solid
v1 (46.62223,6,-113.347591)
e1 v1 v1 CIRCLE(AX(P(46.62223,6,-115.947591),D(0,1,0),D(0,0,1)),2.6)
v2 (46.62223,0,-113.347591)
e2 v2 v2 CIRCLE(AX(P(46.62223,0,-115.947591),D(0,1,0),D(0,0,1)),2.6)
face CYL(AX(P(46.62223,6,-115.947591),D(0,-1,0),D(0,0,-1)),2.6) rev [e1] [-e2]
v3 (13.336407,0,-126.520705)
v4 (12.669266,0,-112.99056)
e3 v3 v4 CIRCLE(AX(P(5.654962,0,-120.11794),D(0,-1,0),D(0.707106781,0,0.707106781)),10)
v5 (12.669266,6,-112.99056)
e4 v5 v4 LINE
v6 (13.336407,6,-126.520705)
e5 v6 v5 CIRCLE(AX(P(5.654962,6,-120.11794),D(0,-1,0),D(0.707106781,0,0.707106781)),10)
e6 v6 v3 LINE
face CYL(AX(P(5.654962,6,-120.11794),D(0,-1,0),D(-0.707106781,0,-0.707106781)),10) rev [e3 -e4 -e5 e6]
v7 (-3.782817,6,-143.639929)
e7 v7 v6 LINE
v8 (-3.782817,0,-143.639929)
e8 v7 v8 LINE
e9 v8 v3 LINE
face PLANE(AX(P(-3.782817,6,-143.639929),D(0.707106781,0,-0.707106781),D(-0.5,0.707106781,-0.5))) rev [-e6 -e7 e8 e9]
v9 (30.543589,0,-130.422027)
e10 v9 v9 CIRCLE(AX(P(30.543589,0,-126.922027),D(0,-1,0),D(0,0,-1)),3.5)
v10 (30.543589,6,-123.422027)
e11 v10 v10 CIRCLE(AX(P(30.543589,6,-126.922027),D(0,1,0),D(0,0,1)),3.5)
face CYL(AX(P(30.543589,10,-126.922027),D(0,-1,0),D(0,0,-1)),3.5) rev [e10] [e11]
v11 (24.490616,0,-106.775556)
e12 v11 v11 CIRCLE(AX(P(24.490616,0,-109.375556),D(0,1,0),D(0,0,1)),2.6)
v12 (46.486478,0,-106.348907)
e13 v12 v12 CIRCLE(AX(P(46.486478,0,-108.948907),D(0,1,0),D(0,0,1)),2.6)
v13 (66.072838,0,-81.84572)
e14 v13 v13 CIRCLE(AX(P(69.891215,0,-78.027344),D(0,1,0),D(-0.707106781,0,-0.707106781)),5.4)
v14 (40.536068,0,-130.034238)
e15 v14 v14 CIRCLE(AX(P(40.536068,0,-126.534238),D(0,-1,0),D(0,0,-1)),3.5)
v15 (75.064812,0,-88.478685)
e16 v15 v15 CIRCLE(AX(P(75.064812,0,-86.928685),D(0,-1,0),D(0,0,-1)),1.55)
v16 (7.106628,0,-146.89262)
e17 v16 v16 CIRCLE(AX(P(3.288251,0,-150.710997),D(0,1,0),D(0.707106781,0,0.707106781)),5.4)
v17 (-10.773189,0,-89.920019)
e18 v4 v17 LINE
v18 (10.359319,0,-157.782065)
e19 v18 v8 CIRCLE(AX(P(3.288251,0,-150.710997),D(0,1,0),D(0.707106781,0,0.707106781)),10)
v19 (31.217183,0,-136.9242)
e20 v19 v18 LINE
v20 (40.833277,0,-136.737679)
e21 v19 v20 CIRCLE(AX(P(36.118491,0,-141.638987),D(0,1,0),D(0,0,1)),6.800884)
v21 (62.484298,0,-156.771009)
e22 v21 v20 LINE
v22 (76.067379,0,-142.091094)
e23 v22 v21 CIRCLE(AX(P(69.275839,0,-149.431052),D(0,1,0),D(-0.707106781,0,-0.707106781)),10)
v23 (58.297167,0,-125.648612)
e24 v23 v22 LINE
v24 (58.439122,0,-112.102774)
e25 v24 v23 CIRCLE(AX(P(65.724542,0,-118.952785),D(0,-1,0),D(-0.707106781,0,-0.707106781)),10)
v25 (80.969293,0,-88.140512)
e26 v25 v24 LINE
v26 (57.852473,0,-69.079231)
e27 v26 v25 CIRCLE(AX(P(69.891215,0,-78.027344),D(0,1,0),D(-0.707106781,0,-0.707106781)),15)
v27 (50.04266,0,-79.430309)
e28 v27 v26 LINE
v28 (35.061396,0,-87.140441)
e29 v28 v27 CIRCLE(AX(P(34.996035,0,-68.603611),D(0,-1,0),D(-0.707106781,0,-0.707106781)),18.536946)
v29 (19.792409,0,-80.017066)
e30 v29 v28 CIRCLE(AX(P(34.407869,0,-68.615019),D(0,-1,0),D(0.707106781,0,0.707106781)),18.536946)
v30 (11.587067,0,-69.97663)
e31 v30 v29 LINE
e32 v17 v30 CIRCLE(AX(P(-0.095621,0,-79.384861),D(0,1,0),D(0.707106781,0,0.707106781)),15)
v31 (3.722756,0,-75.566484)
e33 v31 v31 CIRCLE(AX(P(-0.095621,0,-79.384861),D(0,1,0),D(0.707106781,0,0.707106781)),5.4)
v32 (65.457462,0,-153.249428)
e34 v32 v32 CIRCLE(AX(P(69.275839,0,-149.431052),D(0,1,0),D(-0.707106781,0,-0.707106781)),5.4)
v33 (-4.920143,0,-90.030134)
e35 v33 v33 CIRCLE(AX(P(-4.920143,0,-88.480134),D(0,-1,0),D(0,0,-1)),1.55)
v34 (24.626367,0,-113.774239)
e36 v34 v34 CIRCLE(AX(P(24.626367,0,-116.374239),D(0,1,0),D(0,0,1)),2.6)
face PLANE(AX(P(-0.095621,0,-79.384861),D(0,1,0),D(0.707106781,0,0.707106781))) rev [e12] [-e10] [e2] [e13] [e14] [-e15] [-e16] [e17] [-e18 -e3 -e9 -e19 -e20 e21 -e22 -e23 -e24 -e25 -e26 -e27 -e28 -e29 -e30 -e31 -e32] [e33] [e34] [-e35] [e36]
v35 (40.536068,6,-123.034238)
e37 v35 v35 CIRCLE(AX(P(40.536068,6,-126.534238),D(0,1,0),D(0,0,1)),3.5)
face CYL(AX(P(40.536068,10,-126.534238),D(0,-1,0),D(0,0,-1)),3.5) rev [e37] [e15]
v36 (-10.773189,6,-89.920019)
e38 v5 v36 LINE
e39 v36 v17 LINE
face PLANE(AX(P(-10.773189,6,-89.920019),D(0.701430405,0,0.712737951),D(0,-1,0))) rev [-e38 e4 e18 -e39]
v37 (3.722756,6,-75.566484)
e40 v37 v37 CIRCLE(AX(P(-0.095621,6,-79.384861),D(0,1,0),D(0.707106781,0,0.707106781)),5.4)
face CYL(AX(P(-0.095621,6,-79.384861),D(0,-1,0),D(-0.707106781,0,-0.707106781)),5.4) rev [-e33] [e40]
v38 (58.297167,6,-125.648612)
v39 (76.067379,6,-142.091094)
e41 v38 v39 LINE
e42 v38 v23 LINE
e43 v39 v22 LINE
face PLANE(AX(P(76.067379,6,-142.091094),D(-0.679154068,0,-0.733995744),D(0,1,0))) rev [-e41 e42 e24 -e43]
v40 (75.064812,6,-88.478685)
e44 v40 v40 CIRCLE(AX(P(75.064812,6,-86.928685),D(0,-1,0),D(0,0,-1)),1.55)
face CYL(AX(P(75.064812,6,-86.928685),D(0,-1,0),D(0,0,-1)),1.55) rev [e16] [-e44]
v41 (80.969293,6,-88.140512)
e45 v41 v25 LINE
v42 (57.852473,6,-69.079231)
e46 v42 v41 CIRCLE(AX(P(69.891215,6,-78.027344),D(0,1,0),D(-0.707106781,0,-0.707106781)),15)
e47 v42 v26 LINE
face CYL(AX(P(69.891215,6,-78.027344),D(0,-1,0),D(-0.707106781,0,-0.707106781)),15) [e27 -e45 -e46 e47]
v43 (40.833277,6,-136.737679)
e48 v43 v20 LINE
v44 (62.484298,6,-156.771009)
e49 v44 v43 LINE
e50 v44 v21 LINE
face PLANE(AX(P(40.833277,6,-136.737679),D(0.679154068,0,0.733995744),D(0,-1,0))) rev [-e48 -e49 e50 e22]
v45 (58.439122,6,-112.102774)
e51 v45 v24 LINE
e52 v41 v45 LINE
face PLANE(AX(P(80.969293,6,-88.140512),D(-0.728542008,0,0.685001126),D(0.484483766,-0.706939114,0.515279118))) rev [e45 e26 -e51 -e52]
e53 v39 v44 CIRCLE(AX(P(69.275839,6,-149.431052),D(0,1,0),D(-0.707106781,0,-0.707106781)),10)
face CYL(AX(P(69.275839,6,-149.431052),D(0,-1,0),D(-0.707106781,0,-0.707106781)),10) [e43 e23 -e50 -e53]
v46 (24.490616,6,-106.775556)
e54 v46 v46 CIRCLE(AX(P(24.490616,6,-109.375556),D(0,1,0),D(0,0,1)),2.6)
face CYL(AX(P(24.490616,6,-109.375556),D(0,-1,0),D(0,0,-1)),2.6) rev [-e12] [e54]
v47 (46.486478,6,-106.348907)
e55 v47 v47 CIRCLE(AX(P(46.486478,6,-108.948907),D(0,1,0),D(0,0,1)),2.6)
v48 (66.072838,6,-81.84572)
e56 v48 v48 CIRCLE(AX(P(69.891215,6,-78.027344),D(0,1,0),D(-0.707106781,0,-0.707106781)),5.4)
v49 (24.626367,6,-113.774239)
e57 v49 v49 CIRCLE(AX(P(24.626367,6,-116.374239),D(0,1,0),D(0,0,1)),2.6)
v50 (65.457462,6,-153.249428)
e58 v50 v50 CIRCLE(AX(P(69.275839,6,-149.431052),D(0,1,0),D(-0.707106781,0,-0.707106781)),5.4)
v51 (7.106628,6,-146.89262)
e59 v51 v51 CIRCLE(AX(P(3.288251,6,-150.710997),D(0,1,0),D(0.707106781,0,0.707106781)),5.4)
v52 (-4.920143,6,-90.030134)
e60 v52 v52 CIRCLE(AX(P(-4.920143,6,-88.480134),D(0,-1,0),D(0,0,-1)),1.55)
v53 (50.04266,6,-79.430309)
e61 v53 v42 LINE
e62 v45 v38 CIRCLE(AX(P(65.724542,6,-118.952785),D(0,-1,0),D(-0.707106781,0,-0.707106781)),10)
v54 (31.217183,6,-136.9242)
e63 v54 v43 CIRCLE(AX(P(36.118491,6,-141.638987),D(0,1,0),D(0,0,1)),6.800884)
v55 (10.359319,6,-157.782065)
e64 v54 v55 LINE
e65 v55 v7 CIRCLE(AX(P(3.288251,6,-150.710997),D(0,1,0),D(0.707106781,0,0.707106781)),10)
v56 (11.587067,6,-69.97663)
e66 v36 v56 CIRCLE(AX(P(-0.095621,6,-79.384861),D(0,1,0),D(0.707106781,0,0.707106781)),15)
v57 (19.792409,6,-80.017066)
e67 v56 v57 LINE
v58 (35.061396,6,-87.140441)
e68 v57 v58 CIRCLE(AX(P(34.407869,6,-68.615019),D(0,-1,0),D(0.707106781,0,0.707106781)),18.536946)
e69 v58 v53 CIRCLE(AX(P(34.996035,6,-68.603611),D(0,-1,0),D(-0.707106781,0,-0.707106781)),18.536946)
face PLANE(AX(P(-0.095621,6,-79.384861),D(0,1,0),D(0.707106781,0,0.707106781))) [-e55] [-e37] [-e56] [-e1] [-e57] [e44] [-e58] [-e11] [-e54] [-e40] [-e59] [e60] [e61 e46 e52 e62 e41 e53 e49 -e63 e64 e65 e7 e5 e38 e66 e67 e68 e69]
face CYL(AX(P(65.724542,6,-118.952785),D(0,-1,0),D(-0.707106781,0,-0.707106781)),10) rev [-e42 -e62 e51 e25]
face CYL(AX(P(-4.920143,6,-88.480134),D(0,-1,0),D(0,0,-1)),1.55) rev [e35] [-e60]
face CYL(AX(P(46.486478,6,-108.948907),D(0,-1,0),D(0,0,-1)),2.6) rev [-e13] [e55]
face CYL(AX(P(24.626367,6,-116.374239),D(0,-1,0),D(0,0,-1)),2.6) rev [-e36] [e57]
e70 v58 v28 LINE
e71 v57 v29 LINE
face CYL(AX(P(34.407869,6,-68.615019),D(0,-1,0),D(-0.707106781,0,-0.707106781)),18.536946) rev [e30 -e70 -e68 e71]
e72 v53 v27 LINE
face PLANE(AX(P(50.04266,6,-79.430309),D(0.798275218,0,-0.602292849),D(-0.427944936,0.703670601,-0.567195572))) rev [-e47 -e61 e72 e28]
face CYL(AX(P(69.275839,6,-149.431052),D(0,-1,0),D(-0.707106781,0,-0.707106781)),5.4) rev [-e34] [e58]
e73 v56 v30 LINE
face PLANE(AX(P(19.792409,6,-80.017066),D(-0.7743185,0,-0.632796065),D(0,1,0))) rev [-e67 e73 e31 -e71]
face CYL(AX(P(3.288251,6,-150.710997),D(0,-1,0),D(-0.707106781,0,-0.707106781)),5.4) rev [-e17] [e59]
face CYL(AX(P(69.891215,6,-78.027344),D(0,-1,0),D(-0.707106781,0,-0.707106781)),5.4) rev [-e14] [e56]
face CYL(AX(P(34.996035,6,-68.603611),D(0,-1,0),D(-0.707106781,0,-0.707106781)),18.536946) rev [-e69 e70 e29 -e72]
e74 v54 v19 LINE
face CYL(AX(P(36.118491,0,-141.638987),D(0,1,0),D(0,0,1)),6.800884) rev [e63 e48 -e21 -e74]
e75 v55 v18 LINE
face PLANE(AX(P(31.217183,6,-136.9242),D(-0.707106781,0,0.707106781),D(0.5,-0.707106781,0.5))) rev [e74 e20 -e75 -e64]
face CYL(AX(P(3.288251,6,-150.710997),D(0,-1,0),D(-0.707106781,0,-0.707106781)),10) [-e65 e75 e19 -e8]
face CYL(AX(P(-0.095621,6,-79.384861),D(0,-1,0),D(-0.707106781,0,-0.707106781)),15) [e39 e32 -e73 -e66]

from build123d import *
from build123d.topology import SkipClean

# Parameters (mm, degrees)
SZKIC13_R                          = 5.4
DODANIE_WYCI_GNI_CIE3_DEPTH        = 6
OBIEKT_PRZENIE_KOPIUJ1_START       = -54.137810474
OBIEKT_PRZENIE_KOPIUJ1_DEPTH       = 123.583165808
OBIEKT_PRZENIE_KOPIUJ1_START_2     = 6
OBIEKT_PRZENIE_KOPIUJ1_2_DEPTH     = 63.445355334
OBIEKT_PRZENIE_KOPIUJ1_3_DEPTH     = 54.137810474
OBIEKT_PRZENIE_KOPIUJ1_4_OUTLINE_R = 5.4
OBIEKT_PRZENIE_KOPIUJ1_4_DEPTH     = 6
SZKIC15_R                          = 2.6
WYTNIJ_WYCI_GNI_CIE3_DEPTH         = 136.234453644
SZKIC16_R                          = 1.549999999
WYTNIJ_WYCI_GNI_CIE4_DEPTH         = 134.002110995
WYTNIJ_WYCI_GNI_CIE6_START         = -6
WYTNIJ_WYCI_GNI_CIE6_DEPTH         = 6
SZKIC21_R                          = 3.5
WYTNIJ_WYCI_GNI_CIE7_DEPTH         = 10


# Read off the part's stored shape, not the designer's step: Obiekt-Przenieś/Kopiuj1
with BuildPart() as part:
    # Szkic13 → Dodanie-wyciągnięcie3 (new body)
    with BuildSketch(Plane(origin=(39.644620081, 0, -39.644620081), x_dir=(0.5000000000000003, 0.7071067811865474, 0.4999999999999999), z_dir=(-0.7071067811865474, 0, 0.7071067811865478))):
        with BuildLine():
            Line((-26.485954128, 69.418447832), (-4.834933244, 89.451777745))
            ThreePointArc((-4.834933244, 89.451777745), (9.296564873, 88.903360978), (8.748148106, 74.77186286))
            Line((8.748148106, 74.77186286), (-9.022064337, 58.329380521))
            ThreePointArc((-9.022064337, 58.329380521), (-11.594140152, 51.528763252), (-8.880109301, 44.783542294))
            Line((-8.880109301, 44.783542294), (13.650061572, 20.82128103))
            ThreePointArc((13.650061572, 20.82128103), (12.1147202, -0.864967436), (-9.466757772, 1.760000028))
            Line((-9.466757772, 1.760000028), (-17.276570768, 12.111077891))
            ThreePointArc((-17.276570768, 12.111077891), (-23.840592648, 17.766605638), (-32.257835604, 19.821209823))
            ThreePointArc((-32.257835604, 19.821209823), (-40.748422568, 18.094562685), (-47.526822354, 12.697834632))
            Line((-47.526822354, 12.697834632), (-55.73216456, 2.657398822))
            ThreePointArc((-55.73216456, 2.657398822), (-77.39920267, 0.871312261), (-78.092419853, 22.600787532))
            Line((-78.092419853, 22.600787532), (-54.649965194, 45.671329009))
            ThreePointArc((-54.649965194, 45.671329009), (-51.676403404, 52.306229122), (-53.982823937, 59.201473392))
            Line((-53.982823937, 59.201473392), (-71.102048157, 76.320697612))
            ThreePointArc((-71.102048157, 76.320697612), (-71.102048157, 90.462833236), (-56.959912533, 90.462833236))
            Line((-56.959912533, 90.462833236), (-36.102048157, 69.604968859))
            ThreePointArc((-36.102048157, 69.604968859), (-31.32360944, 67.985252158), (-26.485954128, 69.418447832))
        make_face()
        with Locations(Location((-67.414852174, 12.0656298, 0), (0, 0, 315))):
            Circle(SZKIC13_R, mode=Mode.SUBTRACT)
        with Locations(Location((-64.030980345, 83.391765424, 0), (0, 0, 315))):
            Circle(SZKIC13_R, mode=Mode.SUBTRACT)
        with Locations(Location((2.571983346, 10.708112247, 0), (0, 0, 135))):
            Circle(SZKIC13_R, mode=Mode.SUBTRACT)
        with Locations(Location((1.956607431, 82.111820303, 0), (0, 0, 135))):
            Circle(SZKIC13_R, mode=Mode.SUBTRACT)
    extrude(amount=DODANIE_WYCI_GNI_CIE3_DEPTH)

    # Obiekt-Przenieś/Kopiuj1 outline → Obiekt-Przenieś/Kopiuj1 (cut)
    with BuildSketch(Plane(origin=(0, 0, 0), x_dir=(1, 0, 0), z_dir=(0, 1, 0)).offset(OBIEKT_PRZENIE_KOPIUJ1_START)):
        with BuildLine():
            Line((52.289240162, 27), (10.510980812, 68.77825935))
            ThreePointArc((10.510980812, 68.77825935), (8.120217457, 66.834960669), (5.382849455, 65.421109333))
            Line((5.382849455, 65.421109333), (41.940516661, 28.863442126))
            Line((41.940516661, 28.863442126), (43.803958787, 27))
            Line((43.803958787, 27), (52.289240162, 27))
        make_face()
        with BuildLine():
            ThreePointArc((-3.913997524, 83.203237686), (-3.913997524, 75.56648445), (3.722755712, 75.56648445))
            Line((3.722755712, 75.56648445), (-3.913997524, 83.203237686))
        make_face()
        with BuildLine():
            Line((-45.380461302, 116.18442009), (-14.05937264, 84.863331428))
            ThreePointArc((-14.05937264, 84.863331428), (-12.673028326, 87.558527478), (-10.773188585, 89.9200188))
            Line((-10.773188585, 89.9200188), (-10.701414264, 89.990654426))
            Line((-10.701414264, 89.990654426), (-47, 126.289240162))
            Line((-47, 126.289240162), (-47, 117.803958788))
            Line((-47, 117.803958788), (-45.380461302, 116.18442009))
        make_face()
    extrude(amount=OBIEKT_PRZENIE_KOPIUJ1_DEPTH, mode=Mode.SUBTRACT)

    # Obiekt-Przenie_Kopiuj1 2 outline → Obiekt-Przenie_Kopiuj1 2 (cut)
    with BuildSketch(Plane(origin=(0, 0, 0), x_dir=(1, 0, 0), z_dir=(0, 1, 0)).offset(OBIEKT_PRZENIE_KOPIUJ1_START_2)):
        with BuildLine():
            ThreePointArc((5.382849455, 65.421109333), (8.120217457, 66.834960669), (10.510980812, 68.77825935))
            Line((10.510980812, 68.77825935), (3.722755712, 75.56648445))
            ThreePointArc((3.722755712, 75.56648445), (-3.913997524, 75.56648445), (-3.913997524, 83.203237686))
            Line((-3.913997524, 83.203237686), (-10.701414264, 89.990654426))
            Line((-10.701414264, 89.990654426), (-10.773188585, 89.9200188))
            ThreePointArc((-10.773188585, 89.9200188), (-12.673028326, 87.558527478), (-14.05937264, 84.863331428))
            Line((-14.05937264, 84.863331428), (5.382849455, 65.421109333))
        make_face()
    extrude(amount=OBIEKT_PRZENIE_KOPIUJ1_2_DEPTH, mode=Mode.SUBTRACT)

    # Obiekt-Przenie_Kopiuj1 3 outline → Obiekt-Przenie_Kopiuj1 3 (cut)
    with BuildSketch(Plane(origin=(0, 0, 0), x_dir=(1, 0, 0), z_dir=(0, 1, 0)).offset(OBIEKT_PRZENIE_KOPIUJ1_START)):
        with BuildLine():
            ThreePointArc((5.382849455, 65.421109333), (8.120217457, 66.834960669), (10.510980812, 68.77825935))
            Line((10.510980812, 68.77825935), (3.722755712, 75.56648445))
            ThreePointArc((3.722755712, 75.56648445), (-3.913997524, 75.56648445), (-3.913997524, 83.203237686))
            Line((-3.913997524, 83.203237686), (-10.701414264, 89.990654426))
            Line((-10.701414264, 89.990654426), (-10.773188585, 89.9200188))
            ThreePointArc((-10.773188585, 89.9200188), (-12.673028326, 87.558527478), (-14.05937264, 84.863331428))
            Line((-14.05937264, 84.863331428), (5.382849455, 65.421109333))
        make_face()
    extrude(amount=OBIEKT_PRZENIE_KOPIUJ1_3_DEPTH, mode=Mode.SUBTRACT)

    # Obiekt-Przenie_Kopiuj1 4 outline → Obiekt-Przenie_Kopiuj1 4 (add)
    # profile 1 of 2: a face of its own
    with SkipClean():  # the faces are left unmerged after this step: merging them gives an invalid solid
        with BuildSketch(Plane(origin=(0, 0, 0), x_dir=(1, 0, 0), z_dir=(0, 1, 0))):
            with BuildLine():
                ThreePointArc((10.510980812, 68.77825935), (11.065119564, 69.362991373), (11.587066708, 69.97663009))
                Line((11.587066708, 69.97663009), (19.792408914, 80.0170659))
                ThreePointArc((19.792408914, 80.0170659), (26.5708087, 85.413793952), (35.061395664, 87.14044109))
                ThreePointArc((35.061395664, 87.14044109), (43.47863862, 85.085836906), (50.0426605, 79.430309159))
                Line((50.0426605, 79.430309159), (57.852473496, 69.079231296))
                ThreePointArc((57.852473496, 69.079231296), (79.433951468, 66.454263832), (80.969292839, 88.140512298))
                Line((80.969292839, 88.140512298), (58.439121967, 112.102773562))
                ThreePointArc((58.439121967, 112.102773562), (55.725091116, 118.84799452), (58.297166931, 125.648611789))
                Line((58.297166931, 125.648611789), (76.067379374, 142.091094128))
                ThreePointArc((76.067379374, 142.091094128), (76.615796141, 156.222592245), (62.484298024, 156.771009013))
                Line((62.484298024, 156.771009013), (40.83327714, 136.7376791))
                ThreePointArc((40.83327714, 136.7376791), (35.995621828, 135.304483426), (31.217183111, 136.924200127))
                Line((31.217183111, 136.924200127), (10.359318735, 157.782064504))
                ThreePointArc((10.359318735, 157.782064504), (-3.782816889, 157.782064504), (-3.782816889, 143.63992888))
                Line((-3.782816889, 143.63992888), (13.33640733, 126.52070466))
                ThreePointArc((13.33640733, 126.52070466), (15.642827864, 119.62546039), (12.669266074, 112.990560277))
                Line((12.669266074, 112.990560277), (-10.701414264, 89.990654426))
                Line((-10.701414264, 89.990654426), (-3.913997524, 83.203237686))
                ThreePointArc((-3.913997524, 83.203237686), (3.722755712, 83.203237686), (3.722755712, 75.56648445))
                Line((3.722755712, 75.56648445), (10.510980812, 68.77825935))
            make_face()
            with Locations((69.891214614, 78.027343515)):
                Circle(OBIEKT_PRZENIE_KOPIUJ1_4_OUTLINE_R, mode=Mode.SUBTRACT)
            with Locations((3.288250923, 150.710996692)):
                Circle(OBIEKT_PRZENIE_KOPIUJ1_4_OUTLINE_R, mode=Mode.SUBTRACT)
            with Locations((69.275838699, 149.43105157)):
                Circle(OBIEKT_PRZENIE_KOPIUJ1_4_OUTLINE_R, mode=Mode.SUBTRACT)
        # profile 2 of 2: a face of its own
        with BuildSketch(Plane(origin=(0, 0, 0), x_dir=(1, 0, 0), z_dir=(0, 1, 0))):
            with BuildLine():
                ThreePointArc((-14.05937264, 84.863331428), (-10.702222624, 68.778259349), (5.382849455, 65.421109333))
                Line((5.382849455, 65.421109333), (-14.05937264, 84.863331428))
            make_face()
        extrude(amount=OBIEKT_PRZENIE_KOPIUJ1_4_DEPTH)

    # Szkic15 → Wytnij-wyciągnięcie3 (cut, through all)
    with SkipClean():  # the faces are left unmerged after this step: merging them gives an invalid solid
        with BuildSketch(Plane(origin=(35.401979394, 0, -35.401979394), x_dir=(0.7071067811865477, 0, 0.7071067811865475), z_dir=(0, 1, 0))):
            with Locations(Location((-60.022716756, 44.591718177, 0), (0, 0, 315))):
                Circle(SZKIC15_R)
            with Locations(Location((-64.875542369, 49.636525763, 0), (0, 0, 315))):
                Circle(SZKIC15_R)
            with Locations(Location((-44.167607201, 59.843455816, 0), (0, 0, 315))):
                Circle(SZKIC15_R)
            with Locations(Location((-49.020432814, 64.888263402, 0), (0, 0, 315))):
                Circle(SZKIC15_R)
        extrude(amount=WYTNIJ_WYCI_GNI_CIE3_DEPTH, mode=Mode.SUBTRACT)

    # Szkic16 → Wytnij-wyciągnięcie4 (cut, through all)
    with SkipClean():  # the faces are left unmerged after this step: merging them gives an invalid solid
        with BuildSketch(Plane(origin=(39.644620081, 0, -39.644620081), x_dir=(0.7071067811865477, 0, 0.7071067811865475), z_dir=(0, -1, 0))):
            with Locations(Location((-8.389025144, -58.480741313, 0), (0, 0, 225))):
                Circle(SZKIC16_R)
            with Locations(Location((-66.04396898, -3.019877172, 0), (0, 0, 225))):
                Circle(SZKIC16_R)
        extrude(amount=-WYTNIJ_WYCI_GNI_CIE4_DEPTH, mode=Mode.SUBTRACT)

    # Szkic19 → Wytnij-wyciągnięcie6 (cut)
    with SkipClean():  # the faces are left unmerged after this step: merging them gives an invalid solid
        with BuildSketch(Plane(origin=(0, 6, 0), x_dir=(1, 0, 0), z_dir=(0, 1, 0)).offset(WYTNIJ_WYCI_GNI_CIE6_START)):
            with BuildLine():
                ThreePointArc((31.217183111, 136.924200127), (35.986600356, 134.839381332), (40.83327714, 136.7376791))
                ThreePointArc((40.83327714, 136.7376791), (35.995621828, 135.304483426), (31.217183111, 136.924200127))
            make_face()
        extrude(amount=WYTNIJ_WYCI_GNI_CIE6_DEPTH, mode=Mode.SUBTRACT)

    # Szkic21 → Wytnij-wyciągnięcie7 (cut)
    with SkipClean():  # the faces are left unmerged after this step: merging them gives an invalid solid
        with BuildSketch(Plane.XZ):
            with Locations(Location((40.536067614, -126.534237996, 0), (0, 0, 270))):
                Circle(SZKIC21_R)
            with Locations(Location((30.543589467, -126.922027211, 0), (0, 0, 270))):
                Circle(SZKIC21_R)
        extrude(amount=-WYTNIJ_WYCI_GNI_CIE7_DEPTH, mode=Mode.SUBTRACT)


solid = part.part
